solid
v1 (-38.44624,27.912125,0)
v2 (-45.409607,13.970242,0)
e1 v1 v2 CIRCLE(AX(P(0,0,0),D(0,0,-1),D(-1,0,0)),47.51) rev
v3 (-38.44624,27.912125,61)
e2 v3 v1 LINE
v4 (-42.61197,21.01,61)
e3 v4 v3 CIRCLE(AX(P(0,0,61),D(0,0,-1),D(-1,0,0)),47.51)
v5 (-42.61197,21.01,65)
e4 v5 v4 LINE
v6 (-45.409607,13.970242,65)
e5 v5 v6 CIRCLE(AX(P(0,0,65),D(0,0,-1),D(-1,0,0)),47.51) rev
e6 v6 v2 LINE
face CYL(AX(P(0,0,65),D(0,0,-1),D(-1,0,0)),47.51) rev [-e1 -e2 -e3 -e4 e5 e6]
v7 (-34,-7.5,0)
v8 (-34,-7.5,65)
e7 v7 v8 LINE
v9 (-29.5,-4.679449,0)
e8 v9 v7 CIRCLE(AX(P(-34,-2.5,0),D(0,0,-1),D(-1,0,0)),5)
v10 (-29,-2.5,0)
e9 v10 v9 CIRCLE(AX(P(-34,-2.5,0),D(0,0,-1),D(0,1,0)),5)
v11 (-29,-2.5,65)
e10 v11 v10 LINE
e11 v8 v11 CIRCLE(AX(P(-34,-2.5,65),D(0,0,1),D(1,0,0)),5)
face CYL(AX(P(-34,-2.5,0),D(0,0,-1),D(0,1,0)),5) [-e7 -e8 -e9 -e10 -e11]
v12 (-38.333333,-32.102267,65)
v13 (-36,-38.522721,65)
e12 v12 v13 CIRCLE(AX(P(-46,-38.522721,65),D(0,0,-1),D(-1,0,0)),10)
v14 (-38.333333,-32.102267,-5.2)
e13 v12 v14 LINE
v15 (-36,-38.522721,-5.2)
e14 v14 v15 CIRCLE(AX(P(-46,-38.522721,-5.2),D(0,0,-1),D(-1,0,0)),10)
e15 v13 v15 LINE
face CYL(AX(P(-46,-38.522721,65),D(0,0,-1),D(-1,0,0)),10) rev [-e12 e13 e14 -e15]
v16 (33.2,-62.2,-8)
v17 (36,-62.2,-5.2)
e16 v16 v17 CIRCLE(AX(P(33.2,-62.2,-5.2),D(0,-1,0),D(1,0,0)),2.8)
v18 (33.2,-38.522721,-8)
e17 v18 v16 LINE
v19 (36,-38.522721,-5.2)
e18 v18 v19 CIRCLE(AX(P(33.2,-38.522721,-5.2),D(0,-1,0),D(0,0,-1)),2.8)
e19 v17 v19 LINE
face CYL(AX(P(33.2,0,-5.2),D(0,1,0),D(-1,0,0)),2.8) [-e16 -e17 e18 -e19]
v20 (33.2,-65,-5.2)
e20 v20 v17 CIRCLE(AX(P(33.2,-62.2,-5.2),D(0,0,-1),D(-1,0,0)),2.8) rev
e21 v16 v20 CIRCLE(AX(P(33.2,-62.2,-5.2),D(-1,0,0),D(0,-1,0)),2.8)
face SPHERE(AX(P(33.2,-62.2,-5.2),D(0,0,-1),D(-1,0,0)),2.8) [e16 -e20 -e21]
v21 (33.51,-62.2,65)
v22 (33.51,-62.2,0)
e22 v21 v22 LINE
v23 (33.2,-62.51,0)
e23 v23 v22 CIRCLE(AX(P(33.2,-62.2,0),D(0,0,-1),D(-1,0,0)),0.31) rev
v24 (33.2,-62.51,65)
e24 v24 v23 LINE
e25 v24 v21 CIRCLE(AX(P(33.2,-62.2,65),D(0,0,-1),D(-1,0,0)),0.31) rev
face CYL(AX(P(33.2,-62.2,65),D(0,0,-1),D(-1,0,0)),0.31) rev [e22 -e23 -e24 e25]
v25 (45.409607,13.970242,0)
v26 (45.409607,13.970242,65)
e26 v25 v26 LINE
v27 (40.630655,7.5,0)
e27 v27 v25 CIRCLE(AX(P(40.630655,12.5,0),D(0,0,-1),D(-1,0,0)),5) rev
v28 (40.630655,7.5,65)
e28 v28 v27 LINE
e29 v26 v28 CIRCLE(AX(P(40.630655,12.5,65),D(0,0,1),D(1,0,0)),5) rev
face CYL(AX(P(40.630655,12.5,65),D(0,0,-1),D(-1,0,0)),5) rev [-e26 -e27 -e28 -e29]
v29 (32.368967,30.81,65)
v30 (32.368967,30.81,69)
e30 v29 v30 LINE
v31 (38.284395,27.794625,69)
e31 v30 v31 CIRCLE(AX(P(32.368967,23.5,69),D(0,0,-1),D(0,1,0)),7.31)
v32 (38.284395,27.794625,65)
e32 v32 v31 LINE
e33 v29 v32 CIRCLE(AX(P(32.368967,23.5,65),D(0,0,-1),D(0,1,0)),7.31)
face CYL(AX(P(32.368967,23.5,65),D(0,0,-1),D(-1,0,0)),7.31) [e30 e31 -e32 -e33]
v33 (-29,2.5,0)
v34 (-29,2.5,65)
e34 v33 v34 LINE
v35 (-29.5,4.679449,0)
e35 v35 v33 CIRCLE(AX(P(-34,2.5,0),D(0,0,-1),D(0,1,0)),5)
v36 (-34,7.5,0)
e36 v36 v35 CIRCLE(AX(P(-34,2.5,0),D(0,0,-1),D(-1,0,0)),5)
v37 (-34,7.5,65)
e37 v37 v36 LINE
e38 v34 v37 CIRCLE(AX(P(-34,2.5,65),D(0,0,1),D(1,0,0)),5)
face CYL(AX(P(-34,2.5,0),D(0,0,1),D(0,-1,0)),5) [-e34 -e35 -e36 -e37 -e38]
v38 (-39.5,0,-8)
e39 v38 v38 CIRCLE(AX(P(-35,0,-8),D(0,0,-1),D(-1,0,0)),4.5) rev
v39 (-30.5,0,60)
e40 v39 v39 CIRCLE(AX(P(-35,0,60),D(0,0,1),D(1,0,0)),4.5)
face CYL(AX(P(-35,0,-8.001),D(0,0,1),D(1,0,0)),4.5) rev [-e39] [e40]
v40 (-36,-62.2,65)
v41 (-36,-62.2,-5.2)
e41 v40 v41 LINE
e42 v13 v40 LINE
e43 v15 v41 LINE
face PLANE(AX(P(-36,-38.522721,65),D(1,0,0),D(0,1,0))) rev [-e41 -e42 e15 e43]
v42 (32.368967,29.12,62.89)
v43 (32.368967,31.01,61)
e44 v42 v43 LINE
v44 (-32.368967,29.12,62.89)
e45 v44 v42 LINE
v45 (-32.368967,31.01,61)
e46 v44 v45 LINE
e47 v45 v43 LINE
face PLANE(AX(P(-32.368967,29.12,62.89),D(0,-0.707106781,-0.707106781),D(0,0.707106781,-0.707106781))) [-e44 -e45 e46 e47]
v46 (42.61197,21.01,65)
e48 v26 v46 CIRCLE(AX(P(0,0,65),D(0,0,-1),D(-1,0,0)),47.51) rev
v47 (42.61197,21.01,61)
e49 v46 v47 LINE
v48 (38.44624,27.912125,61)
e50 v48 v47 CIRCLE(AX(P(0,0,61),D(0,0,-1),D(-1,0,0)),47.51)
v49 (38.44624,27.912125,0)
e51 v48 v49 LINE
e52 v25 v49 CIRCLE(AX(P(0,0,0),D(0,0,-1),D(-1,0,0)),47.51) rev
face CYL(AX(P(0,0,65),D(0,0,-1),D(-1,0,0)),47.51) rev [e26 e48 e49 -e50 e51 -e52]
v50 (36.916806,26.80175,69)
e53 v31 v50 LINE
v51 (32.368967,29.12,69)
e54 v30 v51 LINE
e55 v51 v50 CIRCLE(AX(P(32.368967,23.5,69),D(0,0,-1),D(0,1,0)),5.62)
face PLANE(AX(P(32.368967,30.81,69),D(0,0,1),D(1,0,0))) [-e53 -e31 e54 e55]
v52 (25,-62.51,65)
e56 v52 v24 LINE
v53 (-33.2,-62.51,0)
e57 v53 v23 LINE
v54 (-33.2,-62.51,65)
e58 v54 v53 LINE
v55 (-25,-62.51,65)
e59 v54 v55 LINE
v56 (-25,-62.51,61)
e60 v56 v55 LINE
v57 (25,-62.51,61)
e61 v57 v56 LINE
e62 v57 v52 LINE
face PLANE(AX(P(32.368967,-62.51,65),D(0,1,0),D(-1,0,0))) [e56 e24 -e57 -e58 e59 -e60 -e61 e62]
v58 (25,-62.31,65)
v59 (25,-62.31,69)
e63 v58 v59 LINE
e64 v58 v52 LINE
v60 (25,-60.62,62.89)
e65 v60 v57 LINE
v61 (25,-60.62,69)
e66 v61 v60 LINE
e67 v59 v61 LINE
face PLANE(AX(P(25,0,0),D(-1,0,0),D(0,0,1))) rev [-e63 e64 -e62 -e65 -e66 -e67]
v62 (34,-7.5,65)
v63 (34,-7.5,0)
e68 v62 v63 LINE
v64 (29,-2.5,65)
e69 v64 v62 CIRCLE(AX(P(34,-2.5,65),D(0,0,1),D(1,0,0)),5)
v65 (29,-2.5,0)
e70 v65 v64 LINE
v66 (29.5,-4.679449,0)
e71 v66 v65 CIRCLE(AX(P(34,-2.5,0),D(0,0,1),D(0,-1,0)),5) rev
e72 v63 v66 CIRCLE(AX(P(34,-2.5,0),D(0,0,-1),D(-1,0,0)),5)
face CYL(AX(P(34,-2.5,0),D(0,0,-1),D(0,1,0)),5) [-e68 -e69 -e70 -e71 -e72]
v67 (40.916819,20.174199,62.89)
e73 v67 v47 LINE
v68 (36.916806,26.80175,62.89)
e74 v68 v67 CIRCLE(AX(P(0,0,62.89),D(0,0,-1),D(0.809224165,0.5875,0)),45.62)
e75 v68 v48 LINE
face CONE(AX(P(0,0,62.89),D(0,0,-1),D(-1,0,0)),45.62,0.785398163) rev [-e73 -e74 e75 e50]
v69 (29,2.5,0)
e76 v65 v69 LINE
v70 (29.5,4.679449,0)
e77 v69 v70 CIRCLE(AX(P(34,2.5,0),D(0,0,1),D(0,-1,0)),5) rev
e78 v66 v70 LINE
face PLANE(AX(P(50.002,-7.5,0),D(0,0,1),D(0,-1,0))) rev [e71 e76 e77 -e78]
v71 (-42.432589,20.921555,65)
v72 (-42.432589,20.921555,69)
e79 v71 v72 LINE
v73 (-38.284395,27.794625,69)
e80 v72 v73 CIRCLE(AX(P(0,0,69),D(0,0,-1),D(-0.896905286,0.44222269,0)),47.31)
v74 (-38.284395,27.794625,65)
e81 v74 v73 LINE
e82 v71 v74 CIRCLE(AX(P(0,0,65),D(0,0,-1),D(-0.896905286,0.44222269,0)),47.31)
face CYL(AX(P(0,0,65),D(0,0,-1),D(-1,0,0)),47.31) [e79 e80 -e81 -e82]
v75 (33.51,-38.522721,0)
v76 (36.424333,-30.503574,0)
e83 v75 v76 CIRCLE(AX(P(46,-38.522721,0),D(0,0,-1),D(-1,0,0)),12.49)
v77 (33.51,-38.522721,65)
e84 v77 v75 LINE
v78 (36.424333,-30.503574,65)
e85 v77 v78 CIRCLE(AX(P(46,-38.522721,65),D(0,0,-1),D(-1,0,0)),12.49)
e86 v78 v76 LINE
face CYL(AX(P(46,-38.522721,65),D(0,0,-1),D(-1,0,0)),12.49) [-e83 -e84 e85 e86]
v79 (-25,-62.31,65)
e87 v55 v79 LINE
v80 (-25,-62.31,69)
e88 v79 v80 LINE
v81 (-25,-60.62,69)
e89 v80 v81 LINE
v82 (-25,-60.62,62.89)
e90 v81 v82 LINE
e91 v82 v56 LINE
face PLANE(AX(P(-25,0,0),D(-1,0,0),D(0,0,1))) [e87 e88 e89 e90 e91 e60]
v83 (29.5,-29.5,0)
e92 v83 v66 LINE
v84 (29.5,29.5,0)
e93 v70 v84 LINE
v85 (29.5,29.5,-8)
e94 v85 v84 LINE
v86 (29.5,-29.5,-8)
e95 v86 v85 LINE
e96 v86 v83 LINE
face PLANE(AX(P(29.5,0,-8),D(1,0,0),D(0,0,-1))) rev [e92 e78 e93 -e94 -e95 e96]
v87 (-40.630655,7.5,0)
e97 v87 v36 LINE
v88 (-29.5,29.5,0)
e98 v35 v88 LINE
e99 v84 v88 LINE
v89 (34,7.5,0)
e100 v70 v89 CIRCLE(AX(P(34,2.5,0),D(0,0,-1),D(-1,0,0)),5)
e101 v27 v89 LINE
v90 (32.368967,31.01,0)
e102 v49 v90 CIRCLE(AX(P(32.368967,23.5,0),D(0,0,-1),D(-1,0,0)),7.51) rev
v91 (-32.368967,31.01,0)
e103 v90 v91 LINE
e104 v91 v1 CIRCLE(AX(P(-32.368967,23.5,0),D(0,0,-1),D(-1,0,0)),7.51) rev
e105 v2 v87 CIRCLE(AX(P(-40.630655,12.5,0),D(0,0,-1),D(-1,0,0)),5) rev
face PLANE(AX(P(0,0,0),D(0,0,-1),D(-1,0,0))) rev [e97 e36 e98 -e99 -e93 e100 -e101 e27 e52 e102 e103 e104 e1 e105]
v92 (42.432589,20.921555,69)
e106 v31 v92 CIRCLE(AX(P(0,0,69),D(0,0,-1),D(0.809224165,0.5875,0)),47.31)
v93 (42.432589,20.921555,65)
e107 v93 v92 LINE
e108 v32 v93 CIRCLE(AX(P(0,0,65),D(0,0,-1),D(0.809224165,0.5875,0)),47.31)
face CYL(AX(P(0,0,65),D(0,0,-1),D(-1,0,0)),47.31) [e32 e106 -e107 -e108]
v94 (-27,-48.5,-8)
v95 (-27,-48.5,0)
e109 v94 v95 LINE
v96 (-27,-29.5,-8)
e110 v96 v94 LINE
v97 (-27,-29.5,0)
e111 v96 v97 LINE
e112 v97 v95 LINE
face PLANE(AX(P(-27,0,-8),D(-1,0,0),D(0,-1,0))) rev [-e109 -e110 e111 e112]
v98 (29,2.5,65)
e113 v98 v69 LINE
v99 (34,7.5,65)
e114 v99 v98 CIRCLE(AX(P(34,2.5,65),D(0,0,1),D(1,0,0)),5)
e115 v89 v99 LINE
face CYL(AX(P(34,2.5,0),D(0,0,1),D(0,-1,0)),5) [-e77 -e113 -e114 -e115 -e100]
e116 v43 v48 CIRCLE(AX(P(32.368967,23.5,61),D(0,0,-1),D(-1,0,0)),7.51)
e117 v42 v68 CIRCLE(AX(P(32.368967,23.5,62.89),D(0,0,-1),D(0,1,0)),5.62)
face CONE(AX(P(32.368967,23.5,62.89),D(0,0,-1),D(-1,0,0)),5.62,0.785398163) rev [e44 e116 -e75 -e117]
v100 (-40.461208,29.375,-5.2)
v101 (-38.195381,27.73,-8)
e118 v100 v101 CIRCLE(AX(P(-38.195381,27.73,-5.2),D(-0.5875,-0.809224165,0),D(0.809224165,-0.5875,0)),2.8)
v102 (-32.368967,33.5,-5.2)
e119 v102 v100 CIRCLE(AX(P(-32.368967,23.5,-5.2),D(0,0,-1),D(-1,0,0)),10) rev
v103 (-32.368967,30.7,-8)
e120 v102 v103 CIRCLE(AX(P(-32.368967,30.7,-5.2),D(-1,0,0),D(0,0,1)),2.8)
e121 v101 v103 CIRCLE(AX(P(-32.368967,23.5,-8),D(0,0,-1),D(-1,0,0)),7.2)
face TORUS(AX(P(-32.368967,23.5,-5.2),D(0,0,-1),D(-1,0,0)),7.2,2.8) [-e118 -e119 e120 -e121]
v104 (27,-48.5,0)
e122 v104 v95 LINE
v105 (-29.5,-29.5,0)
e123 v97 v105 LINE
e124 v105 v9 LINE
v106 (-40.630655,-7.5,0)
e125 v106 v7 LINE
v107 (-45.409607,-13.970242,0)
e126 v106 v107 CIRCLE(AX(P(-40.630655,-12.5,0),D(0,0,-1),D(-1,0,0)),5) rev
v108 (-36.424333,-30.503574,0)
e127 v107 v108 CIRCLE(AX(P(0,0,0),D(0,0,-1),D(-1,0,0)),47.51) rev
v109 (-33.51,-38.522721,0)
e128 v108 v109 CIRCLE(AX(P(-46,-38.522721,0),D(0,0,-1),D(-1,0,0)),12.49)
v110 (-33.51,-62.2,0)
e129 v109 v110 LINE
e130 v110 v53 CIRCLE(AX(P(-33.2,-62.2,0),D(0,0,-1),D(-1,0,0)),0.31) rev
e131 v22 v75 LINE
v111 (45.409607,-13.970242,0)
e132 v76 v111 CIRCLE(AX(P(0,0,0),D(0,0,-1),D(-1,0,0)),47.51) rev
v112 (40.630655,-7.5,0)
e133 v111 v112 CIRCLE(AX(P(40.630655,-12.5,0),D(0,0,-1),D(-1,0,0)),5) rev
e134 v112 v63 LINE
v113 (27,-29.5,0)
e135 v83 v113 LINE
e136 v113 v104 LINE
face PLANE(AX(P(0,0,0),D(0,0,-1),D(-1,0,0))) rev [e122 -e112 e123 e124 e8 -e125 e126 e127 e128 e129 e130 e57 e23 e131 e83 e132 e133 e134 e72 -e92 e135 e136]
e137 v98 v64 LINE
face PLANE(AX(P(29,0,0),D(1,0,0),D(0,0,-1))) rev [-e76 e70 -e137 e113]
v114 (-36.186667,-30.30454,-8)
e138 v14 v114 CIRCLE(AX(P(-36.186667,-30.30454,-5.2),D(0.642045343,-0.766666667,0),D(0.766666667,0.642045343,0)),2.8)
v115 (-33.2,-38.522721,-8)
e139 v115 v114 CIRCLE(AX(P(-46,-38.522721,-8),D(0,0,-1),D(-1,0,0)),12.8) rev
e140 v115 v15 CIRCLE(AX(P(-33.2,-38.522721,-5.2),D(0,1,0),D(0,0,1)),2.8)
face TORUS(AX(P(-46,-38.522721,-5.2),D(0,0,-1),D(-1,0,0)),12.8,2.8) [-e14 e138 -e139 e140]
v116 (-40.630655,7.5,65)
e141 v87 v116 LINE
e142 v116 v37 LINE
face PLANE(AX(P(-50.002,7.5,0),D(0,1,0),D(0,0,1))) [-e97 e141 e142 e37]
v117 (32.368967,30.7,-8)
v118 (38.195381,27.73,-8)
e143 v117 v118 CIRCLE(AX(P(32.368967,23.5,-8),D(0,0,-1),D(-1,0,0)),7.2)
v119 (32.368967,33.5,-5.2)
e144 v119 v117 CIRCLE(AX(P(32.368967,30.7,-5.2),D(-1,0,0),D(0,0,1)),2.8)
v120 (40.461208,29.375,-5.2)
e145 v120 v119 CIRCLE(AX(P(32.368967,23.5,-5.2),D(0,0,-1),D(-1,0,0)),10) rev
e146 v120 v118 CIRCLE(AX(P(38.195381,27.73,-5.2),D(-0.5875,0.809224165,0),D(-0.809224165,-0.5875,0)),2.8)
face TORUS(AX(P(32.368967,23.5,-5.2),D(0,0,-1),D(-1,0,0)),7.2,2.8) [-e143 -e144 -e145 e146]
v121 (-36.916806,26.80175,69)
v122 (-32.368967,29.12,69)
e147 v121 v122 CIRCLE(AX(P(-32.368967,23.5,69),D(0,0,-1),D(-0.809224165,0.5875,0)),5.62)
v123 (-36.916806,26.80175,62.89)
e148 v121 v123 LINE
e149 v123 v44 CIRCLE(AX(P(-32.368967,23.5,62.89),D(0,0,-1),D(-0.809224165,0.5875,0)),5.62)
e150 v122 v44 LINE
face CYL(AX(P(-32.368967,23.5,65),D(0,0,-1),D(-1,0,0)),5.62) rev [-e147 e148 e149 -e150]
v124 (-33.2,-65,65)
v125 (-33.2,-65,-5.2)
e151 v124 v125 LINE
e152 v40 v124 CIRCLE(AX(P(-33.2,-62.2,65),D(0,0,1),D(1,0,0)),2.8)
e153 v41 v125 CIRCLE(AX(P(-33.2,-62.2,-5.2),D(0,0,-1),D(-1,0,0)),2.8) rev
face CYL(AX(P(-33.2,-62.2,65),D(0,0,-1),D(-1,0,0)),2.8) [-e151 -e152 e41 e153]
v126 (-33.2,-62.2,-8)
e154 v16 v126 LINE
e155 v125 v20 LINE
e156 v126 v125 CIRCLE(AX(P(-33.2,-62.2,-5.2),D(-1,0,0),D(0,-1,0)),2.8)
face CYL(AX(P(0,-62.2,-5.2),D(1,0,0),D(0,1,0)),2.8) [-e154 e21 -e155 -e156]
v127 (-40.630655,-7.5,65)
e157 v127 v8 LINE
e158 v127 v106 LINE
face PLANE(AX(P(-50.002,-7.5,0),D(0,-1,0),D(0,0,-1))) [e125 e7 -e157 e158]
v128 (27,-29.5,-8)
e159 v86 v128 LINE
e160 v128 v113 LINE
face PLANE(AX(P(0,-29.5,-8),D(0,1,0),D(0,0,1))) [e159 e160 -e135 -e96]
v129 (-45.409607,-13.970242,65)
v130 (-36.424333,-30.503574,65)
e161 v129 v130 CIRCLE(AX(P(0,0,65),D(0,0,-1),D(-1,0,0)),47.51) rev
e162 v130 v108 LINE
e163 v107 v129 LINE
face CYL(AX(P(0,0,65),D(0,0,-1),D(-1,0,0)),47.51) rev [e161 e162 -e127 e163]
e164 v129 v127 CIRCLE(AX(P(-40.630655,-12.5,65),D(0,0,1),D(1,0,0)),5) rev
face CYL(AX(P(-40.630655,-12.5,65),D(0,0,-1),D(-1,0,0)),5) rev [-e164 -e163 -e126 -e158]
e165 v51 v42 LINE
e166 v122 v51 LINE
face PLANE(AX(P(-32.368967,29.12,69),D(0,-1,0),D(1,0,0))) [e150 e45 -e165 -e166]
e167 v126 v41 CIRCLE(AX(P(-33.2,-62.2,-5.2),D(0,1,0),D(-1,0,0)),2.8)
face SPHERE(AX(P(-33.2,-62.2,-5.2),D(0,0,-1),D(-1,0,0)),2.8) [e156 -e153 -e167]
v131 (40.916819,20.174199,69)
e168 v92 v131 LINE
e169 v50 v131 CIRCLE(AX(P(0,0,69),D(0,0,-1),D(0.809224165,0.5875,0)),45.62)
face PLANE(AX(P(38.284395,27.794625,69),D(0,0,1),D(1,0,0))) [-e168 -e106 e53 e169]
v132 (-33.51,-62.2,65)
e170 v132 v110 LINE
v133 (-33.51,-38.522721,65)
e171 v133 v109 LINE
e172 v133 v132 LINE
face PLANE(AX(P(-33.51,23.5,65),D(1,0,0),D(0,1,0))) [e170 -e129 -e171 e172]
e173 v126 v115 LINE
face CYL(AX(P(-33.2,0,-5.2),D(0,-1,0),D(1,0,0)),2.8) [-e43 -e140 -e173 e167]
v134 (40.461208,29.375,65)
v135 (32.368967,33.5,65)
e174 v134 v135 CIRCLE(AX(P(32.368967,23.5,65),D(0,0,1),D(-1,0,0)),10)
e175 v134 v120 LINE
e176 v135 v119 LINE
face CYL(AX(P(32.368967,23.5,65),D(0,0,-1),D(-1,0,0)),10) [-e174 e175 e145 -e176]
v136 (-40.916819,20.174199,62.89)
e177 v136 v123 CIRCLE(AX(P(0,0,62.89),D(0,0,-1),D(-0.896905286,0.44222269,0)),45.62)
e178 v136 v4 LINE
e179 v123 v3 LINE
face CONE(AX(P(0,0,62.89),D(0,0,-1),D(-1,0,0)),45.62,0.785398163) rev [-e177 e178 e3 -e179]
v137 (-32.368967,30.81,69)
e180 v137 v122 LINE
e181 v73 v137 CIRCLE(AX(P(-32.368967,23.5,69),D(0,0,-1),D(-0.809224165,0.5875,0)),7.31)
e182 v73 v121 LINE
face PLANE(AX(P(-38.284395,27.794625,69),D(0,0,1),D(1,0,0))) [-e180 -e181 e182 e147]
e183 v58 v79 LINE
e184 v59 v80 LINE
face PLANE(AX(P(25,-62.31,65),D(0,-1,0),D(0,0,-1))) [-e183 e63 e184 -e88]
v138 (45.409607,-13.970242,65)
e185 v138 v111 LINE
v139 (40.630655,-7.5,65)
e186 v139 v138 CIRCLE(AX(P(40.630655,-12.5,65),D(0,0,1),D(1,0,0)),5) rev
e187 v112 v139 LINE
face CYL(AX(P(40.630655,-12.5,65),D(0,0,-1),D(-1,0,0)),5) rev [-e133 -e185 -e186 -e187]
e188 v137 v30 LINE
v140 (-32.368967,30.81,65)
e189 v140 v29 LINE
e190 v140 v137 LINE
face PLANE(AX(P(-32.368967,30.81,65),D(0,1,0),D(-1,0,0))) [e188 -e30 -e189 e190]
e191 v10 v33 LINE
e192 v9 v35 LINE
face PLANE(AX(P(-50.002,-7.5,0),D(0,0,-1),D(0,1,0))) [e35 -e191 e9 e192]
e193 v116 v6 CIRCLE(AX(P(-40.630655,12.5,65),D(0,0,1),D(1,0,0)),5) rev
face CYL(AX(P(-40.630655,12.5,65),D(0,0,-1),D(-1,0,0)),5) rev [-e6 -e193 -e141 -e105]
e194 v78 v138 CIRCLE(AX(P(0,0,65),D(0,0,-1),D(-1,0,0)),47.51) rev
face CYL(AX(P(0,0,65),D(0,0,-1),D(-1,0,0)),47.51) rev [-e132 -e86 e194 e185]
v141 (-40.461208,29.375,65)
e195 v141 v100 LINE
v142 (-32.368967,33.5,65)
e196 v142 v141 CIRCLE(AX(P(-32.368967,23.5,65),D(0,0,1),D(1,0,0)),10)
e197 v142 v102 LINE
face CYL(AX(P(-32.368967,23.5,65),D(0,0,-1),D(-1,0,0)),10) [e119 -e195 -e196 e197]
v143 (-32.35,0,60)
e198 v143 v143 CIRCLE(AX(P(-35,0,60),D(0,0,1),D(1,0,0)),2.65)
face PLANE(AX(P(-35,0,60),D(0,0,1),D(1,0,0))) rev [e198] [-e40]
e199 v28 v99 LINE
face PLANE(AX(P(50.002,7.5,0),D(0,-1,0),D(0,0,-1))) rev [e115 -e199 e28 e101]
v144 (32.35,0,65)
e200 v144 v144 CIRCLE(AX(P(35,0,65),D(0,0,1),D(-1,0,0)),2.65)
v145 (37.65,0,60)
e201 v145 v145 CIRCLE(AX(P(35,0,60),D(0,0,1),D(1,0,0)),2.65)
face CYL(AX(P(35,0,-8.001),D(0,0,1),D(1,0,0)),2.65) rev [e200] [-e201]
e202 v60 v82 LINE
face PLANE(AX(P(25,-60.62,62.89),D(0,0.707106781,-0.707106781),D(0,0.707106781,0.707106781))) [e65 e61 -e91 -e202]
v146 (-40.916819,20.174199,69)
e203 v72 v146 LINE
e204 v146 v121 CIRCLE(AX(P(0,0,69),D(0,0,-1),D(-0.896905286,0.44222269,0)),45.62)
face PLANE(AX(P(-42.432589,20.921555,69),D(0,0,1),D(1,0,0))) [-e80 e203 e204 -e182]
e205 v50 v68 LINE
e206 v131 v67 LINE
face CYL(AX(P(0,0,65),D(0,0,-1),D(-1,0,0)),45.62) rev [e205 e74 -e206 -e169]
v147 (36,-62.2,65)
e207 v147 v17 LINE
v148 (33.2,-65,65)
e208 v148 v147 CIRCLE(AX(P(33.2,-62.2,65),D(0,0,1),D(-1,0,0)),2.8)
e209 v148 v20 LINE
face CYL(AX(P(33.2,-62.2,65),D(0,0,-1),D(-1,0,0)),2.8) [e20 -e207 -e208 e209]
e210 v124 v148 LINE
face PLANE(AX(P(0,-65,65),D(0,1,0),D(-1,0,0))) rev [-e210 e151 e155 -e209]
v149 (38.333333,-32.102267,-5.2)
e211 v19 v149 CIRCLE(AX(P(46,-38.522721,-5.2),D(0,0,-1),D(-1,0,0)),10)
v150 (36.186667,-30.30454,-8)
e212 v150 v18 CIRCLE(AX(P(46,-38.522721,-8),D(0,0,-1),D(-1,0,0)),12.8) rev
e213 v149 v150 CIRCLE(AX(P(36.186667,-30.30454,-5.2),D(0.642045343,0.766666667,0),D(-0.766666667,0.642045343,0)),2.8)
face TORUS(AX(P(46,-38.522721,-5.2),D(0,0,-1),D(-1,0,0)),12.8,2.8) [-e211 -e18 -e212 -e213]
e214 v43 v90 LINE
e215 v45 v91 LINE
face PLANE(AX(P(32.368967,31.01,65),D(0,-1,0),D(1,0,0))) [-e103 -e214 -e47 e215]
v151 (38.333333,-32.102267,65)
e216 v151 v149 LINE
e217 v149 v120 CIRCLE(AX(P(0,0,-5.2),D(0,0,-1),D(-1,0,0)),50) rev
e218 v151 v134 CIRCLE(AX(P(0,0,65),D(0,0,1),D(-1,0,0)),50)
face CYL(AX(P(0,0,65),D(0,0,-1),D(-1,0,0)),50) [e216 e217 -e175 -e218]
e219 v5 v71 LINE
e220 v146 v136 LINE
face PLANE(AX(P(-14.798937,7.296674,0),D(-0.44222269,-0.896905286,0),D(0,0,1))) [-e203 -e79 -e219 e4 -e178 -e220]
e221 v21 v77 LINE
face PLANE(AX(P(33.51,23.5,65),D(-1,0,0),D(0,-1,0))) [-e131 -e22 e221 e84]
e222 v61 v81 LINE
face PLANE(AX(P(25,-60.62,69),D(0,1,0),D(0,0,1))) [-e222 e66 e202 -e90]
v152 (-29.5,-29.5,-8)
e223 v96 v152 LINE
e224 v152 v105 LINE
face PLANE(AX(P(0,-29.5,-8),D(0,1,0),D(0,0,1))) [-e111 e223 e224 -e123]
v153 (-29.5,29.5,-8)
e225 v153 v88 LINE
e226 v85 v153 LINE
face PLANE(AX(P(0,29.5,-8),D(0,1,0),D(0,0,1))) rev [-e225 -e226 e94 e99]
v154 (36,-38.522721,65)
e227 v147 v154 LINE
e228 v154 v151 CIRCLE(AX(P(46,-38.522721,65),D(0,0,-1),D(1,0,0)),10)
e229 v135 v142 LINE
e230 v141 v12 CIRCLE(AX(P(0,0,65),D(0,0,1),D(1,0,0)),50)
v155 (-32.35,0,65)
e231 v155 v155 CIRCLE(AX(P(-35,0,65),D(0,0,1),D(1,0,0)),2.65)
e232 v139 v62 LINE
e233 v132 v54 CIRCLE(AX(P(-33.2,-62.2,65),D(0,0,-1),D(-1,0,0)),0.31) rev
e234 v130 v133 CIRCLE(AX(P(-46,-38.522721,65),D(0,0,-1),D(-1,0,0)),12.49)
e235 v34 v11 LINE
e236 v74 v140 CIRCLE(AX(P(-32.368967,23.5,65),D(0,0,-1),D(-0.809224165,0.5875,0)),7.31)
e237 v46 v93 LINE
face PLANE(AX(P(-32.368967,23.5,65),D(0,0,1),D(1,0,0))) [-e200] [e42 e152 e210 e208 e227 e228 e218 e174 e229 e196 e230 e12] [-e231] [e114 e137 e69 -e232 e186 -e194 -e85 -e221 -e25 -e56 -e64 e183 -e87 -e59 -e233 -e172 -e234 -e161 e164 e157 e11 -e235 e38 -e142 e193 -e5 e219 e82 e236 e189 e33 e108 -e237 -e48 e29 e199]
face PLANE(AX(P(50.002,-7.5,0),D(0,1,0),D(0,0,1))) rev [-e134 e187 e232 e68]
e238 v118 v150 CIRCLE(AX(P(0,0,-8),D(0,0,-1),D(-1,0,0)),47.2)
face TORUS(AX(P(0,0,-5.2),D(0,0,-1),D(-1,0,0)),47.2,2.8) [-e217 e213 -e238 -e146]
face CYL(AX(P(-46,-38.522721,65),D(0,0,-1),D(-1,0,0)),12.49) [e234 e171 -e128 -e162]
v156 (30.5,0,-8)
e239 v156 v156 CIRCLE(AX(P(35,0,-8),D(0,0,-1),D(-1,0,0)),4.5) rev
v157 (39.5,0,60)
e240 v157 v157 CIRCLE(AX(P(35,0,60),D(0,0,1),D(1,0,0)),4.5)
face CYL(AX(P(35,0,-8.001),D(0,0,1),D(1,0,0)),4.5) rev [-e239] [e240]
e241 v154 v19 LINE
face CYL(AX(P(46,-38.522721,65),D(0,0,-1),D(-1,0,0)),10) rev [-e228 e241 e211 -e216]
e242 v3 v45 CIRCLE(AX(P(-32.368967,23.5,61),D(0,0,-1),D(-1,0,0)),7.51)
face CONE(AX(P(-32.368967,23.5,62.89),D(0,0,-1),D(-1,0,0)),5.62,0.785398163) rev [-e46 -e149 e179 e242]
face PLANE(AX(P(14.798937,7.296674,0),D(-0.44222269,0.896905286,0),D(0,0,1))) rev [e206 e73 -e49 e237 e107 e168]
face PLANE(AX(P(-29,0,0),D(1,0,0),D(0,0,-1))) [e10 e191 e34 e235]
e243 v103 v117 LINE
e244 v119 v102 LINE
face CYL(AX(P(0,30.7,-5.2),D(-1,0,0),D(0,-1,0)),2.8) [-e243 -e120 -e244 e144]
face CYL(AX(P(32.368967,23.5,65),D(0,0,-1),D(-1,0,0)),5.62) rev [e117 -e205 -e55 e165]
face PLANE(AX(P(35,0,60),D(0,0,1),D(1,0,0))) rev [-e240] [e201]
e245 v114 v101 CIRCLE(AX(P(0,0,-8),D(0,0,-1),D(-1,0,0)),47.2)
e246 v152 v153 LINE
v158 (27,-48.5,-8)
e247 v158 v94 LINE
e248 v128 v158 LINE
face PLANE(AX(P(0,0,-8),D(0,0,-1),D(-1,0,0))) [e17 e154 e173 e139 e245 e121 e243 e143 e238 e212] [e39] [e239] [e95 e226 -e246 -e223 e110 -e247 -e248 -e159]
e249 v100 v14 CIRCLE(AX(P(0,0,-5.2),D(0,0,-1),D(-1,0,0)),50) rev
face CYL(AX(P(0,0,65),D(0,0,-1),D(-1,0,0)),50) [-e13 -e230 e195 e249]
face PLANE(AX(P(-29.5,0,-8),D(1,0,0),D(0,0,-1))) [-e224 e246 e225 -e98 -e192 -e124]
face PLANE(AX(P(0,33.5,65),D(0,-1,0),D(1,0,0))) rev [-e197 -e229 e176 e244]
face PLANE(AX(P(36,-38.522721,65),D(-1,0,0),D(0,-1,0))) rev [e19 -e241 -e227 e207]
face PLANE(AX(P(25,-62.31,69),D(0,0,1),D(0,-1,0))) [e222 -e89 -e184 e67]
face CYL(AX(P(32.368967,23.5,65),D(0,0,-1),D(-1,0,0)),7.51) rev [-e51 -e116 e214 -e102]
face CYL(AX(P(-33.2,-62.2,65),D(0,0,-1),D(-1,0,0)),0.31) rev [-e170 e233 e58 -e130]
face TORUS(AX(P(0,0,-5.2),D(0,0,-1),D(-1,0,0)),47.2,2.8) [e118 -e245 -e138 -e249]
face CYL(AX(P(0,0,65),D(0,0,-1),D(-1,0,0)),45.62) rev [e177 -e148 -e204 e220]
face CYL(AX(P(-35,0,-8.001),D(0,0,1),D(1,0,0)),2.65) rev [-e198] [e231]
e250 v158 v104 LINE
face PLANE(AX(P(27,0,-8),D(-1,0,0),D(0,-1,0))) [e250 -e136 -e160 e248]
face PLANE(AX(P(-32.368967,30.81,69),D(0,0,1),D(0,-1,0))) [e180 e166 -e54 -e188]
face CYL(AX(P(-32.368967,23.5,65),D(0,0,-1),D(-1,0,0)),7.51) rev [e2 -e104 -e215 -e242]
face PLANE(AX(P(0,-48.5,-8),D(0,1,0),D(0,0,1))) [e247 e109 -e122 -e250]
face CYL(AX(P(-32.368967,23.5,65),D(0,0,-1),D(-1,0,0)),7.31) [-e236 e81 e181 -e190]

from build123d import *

# Parameters (mm, degrees)
LINEAR_AUSTRAGEN_D_NN1_DEPTH         = 65
AUFSATZ_LINEAR_START                 = 8
AUFSATZ_LINEAR_AUSTRAGEN2_DEPTH      = 8
AUFSATZ_LINEAR_AUSTRAGEN3_REACH      = 135.642
AUFSATZ_LINEAR_AUSTRAGEN3_END_RADIUS = 47.51
AUFSATZ_LINEAR_START_2               = 29
SKIZZE6_W                            = 65
SKIZZE6_H                            = 15
AUFSATZ_LINEAR_AUSTRAGEN4_REACH      = 135.642
AUFSATZ_LINEAR_START_3               = -29
SKIZZE6_2_W                          = 65
SKIZZE6_2_H                          = 15
SCHNITT_LINEAR_AUSTRAGEN2_REACH      = 111.791
SKIZZE7_R                            = 2.65
SCHNITT_LINEAR_AUSTRAGEN3_REACH      = 116.791
SCHNITT_LINEAR_START                 = -5
SKIZZE8_R                            = 4.5
AUFSATZ_LINEAR_AUSTRAGEN6_DEPTH      = 25
VERRUNDUNG1_R                        = 5
VERRUNDUNG3_R                        = 2.8


with BuildPart() as part:
    # Skizze1 → Linear-Austragen-Dünn1 (new body)
    with BuildSketch(Plane.XY):
        with BuildLine():
            Line((-33.2, -65), (0, -65))
            Line((0, -65), (33.2, -65))
            ThreePointArc((33.2, -65), (35.179898987, -64.179898987), (36, -62.2))
            Line((36, -62.2), (36, -38.522720569))
            ThreePointArc((36, -38.522720569), (36.601418547, -35.107070313), (38.333333333, -32.10226714))
            ThreePointArc((38.333333333, -32.10226714), (49.970076451, -1.729583607), (40.461208274, 29.375))
            ThreePointArc((40.461208274, 29.375), (36.91044215, 32.409264841), (32.368966619, 33.5))
            Line((32.368966619, 33.5), (0, 33.5))
            Line((0, 33.5), (-32.368966619, 33.5))
            ThreePointArc((-32.368966619, 33.5), (-36.91044215, 32.409264841), (-40.461208274, 29.375))
            ThreePointArc((-40.461208274, 29.375), (-49.970076451, -1.729583607), (-38.333333333, -32.10226714))
            ThreePointArc((-38.333333333, -32.10226714), (-36.601418547, -35.107070313), (-36, -38.522720569))
            Line((-36, -38.522720569), (-36, -62.2))
            ThreePointArc((-36, -62.2), (-35.179898987, -64.179898987), (-33.2, -65))
        make_face()
        with BuildLine():
            Line((-33.2, -62.51), (0, -62.51))
            Line((0, -62.51), (33.2, -62.51))
            ThreePointArc((33.2, -62.51), (33.419203102, -62.419203102), (33.51, -62.2))
            Line((33.51, -62.2), (33.51, -38.522720569))
            ThreePointArc((33.51, -38.522720569), (34.261171765, -34.2565734), (36.424333333, -30.503574237))
            ThreePointArc((36.424333333, -30.503574237), (47.481566644, -1.643450344), (38.446240102, 27.912125))
            ThreePointArc((38.446240102, 27.912125), (35.779614743, 30.190857895), (32.368966619, 31.01))
            Line((32.368966619, 31.01), (0, 31.01))
            Line((0, 31.01), (-32.368966619, 31.01))
            ThreePointArc((-32.368966619, 31.01), (-35.779614743, 30.190857895), (-38.446240102, 27.912125))
            ThreePointArc((-38.446240102, 27.912125), (-47.481566644, -1.643450344), (-36.424333333, -30.503574237))
            ThreePointArc((-36.424333333, -30.503574237), (-34.261171765, -34.2565734), (-33.51, -38.522720569))
            Line((-33.51, -38.522720569), (-33.51, -62.2))
            ThreePointArc((-33.51, -62.2), (-33.419203102, -62.419203102), (-33.2, -62.51))
        make_face(mode=Mode.SUBTRACT)
    extrude(amount=LINEAR_AUSTRAGEN_D_NN1_DEPTH)

    # Skizze3 → Aufsatz-Linear austragen2 (add)
    # profile 1 of 2: a face of its own
    with BuildSketch(Plane(origin=(0, 0, 0), x_dir=(-1, 0, 0), z_dir=(0, 0, -1)).offset(AUFSATZ_LINEAR_START)):
        with BuildLine():
            ThreePointArc((40.461208274, 29.375), (36.91044215, 32.409264841), (32.368966619, 33.5))
            Line((32.368966619, 33.5), (-32.368966619, 33.5))
            ThreePointArc((-32.368966619, 33.5), (-36.91044215, 32.409264841), (-40.461208274, 29.375))
            ThreePointArc((-40.461208274, 29.375), (-49.970076451, -1.729583607), (-38.333333333, -32.10226714))
            ThreePointArc((-38.333333333, -32.10226714), (-36.601418547, -35.107070313), (-36, -38.522720569))
            Line((-36, -38.522720569), (-36, -62.2))
            ThreePointArc((-36, -62.2), (-35.179898987, -64.179898987), (-33.2, -65))
            Line((-33.2, -65), (33.2, -65))
            ThreePointArc((33.2, -65), (35.179898987, -64.179898987), (36, -62.2))
            Line((36, -62.2), (36, -38.522720569))
            ThreePointArc((36, -38.522720569), (36.601418547, -35.107070313), (38.333333333, -32.10226714))
            ThreePointArc((38.333333333, -32.10226714), (49.970076451, -1.729583607), (40.461208274, 29.375))
        make_face()
        with BuildLine():
            ThreePointArc((-38.446240102, 27.912125), (-35.779614743, 30.190857895), (-32.368966619, 31.01))
            Line((-32.368966619, 31.01), (32.368966619, 31.01))
            ThreePointArc((32.368966619, 31.01), (35.779614743, 30.190857895), (38.446240102, 27.912125))
            ThreePointArc((38.446240102, 27.912125), (47.481566644, -1.643450344), (36.424333333, -30.503574237))
            ThreePointArc((36.424333333, -30.503574237), (34.261171765, -34.2565734), (33.51, -38.522720569))
            Line((33.51, -38.522720569), (33.51, -62.2))
            ThreePointArc((33.51, -62.2), (33.419203102, -62.419203102), (33.2, -62.51))
            Line((33.2, -62.51), (-33.2, -62.51))
            ThreePointArc((-33.2, -62.51), (-33.419203102, -62.419203102), (-33.51, -62.2))
            Line((-33.51, -62.2), (-33.51, -38.522720569))
            ThreePointArc((-33.51, -38.522720569), (-34.261171765, -34.2565734), (-36.424333333, -30.503574237))
            ThreePointArc((-36.424333333, -30.503574237), (-47.481566644, -1.643450344), (-38.446240102, 27.912125))
        make_face(mode=Mode.SUBTRACT)
    # profile 2 of 2: a face of its own
    with BuildSketch(Plane(origin=(0, 0, 0), x_dir=(-1, 0, 0), z_dir=(0, 0, -1)).offset(AUFSATZ_LINEAR_START)):
        with BuildLine():
            Line((32.368966619, 31.01), (-32.368966619, 31.01))
            ThreePointArc((-32.368966619, 31.01), (-35.779614743, 30.190857895), (-38.446240102, 27.912125))
            ThreePointArc((-38.446240102, 27.912125), (-47.481566644, -1.643450344), (-36.424333333, -30.503574237))
            ThreePointArc((-36.424333333, -30.503574237), (-34.261171765, -34.2565734), (-33.51, -38.522720569))
            Line((-33.51, -38.522720569), (-33.51, -62.2))
            ThreePointArc((-33.51, -62.2), (-33.419203102, -62.419203102), (-33.2, -62.51))
            Line((-33.2, -62.51), (33.2, -62.51))
            ThreePointArc((33.2, -62.51), (33.419203102, -62.419203102), (33.51, -62.2))
            Line((33.51, -62.2), (33.51, -38.522720569))
            ThreePointArc((33.51, -38.522720569), (34.261171765, -34.2565734), (36.424333333, -30.503574237))
            ThreePointArc((36.424333333, -30.503574237), (47.481566644, -1.643450344), (38.446240102, 27.912125))
            ThreePointArc((38.446240102, 27.912125), (35.779614743, 30.190857895), (32.368966619, 31.01))
        make_face()
        Polygon((-27, -29.5), (-29.5, -29.5), (-29.5, 29.5), (29.5, 29.5), (29.5, -29.5), (27, -29.5), (27, -48.5), (-27, -48.5), align=None, mode=Mode.SUBTRACT)
    extrude(amount=-AUFSATZ_LINEAR_AUSTRAGEN2_DEPTH)

    # Aufsatz-Linear austragen3: up to this cylinder (the profile starts inside it)
    aufsatz_linear_austragen3_end = Plane(origin=(0, 0, 32.5), z_dir=(0, 0, -1)) * Cylinder(AUFSATZ_LINEAR_AUSTRAGEN3_END_RADIUS, 367.304, mode=Mode.PRIVATE)
    # Skizze6 → Aufsatz-Linear austragen3 (add, up to the surface)
    with BuildSketch(Plane(origin=(0, 0, 0), x_dir=(0, 0, -1), z_dir=(1, 0, 0)).offset(AUFSATZ_LINEAR_START_2), mode=Mode.PRIVATE) as aufsatz_linear_austragen3_sk1:
        with Locations((-32.5, 0)):
            Rectangle(SKIZZE6_W, SKIZZE6_H)
    aufsatz_linear_austragen3_tool1 = extrude(aufsatz_linear_austragen3_sk1.sketch, amount=AUFSATZ_LINEAR_AUSTRAGEN3_REACH, mode=Mode.PRIVATE) & aufsatz_linear_austragen3_end
    add(aufsatz_linear_austragen3_tool1.solids().sort_by_distance((29, 0, 32.5))[0])

    # Skizze6<2> → Aufsatz-Linear austragen4 (add, up to next)
    with BuildSketch(Plane(origin=(0, 0, 0), x_dir=(0, 0, -1), z_dir=(1, 0, 0)).offset(AUFSATZ_LINEAR_START_3), mode=Mode.PRIVATE) as aufsatz_linear_austragen4_sk1:
        with Locations((-32.5, 0)):
            Rectangle(SKIZZE6_2_W, SKIZZE6_2_H)
    aufsatz_linear_austragen4_tool1 = extrude(aufsatz_linear_austragen4_sk1.sketch, amount=-AUFSATZ_LINEAR_AUSTRAGEN4_REACH, mode=Mode.PRIVATE) - part.part
    add(aufsatz_linear_austragen4_tool1.solids().sort_by_distance((-29, 0, 32.5))[0])

    # Skizze7 → Schnitt-Linear austragen2 (cut, up to next)
    with BuildSketch(Plane.XY.offset(65), mode=Mode.PRIVATE) as schnitt_linear_austragen2_sk1:
        with Locations((-35, 0)):
            Circle(SKIZZE7_R)
    schnitt_linear_austragen2_tool1 = extrude(schnitt_linear_austragen2_sk1.sketch, amount=-SCHNITT_LINEAR_AUSTRAGEN2_REACH, mode=Mode.PRIVATE) & part.part
    # Skizze7 → Schnitt-Linear austragen2 (cut, up to next)
    with BuildSketch(Plane.XY.offset(65), mode=Mode.PRIVATE) as schnitt_linear_austragen2_sk2:
        with Locations(Location((35, 0, 0), (0, 0, 180))):
            Circle(SKIZZE7_R)
    schnitt_linear_austragen2_tool2 = extrude(schnitt_linear_austragen2_sk2.sketch, amount=-SCHNITT_LINEAR_AUSTRAGEN2_REACH, mode=Mode.PRIVATE) & part.part
    add(schnitt_linear_austragen2_tool1.solids().sort_by_distance((-35, 0, 65))[0], mode=Mode.SUBTRACT)
    add(schnitt_linear_austragen2_tool2.solids().sort_by_distance((35, 0, 65))[0], mode=Mode.SUBTRACT)

    # Skizze8 → Schnitt-Linear austragen3 (cut, up to next)
    with BuildSketch(Plane.XY.offset(65).offset(SCHNITT_LINEAR_START), mode=Mode.PRIVATE) as schnitt_linear_austragen3_sk1:
        with Locations((-35, 0)):
            Circle(SKIZZE8_R)
    schnitt_linear_austragen3_tool1 = extrude(schnitt_linear_austragen3_sk1.sketch, amount=-SCHNITT_LINEAR_AUSTRAGEN3_REACH, mode=Mode.PRIVATE) & part.part
    # Skizze8 → Schnitt-Linear austragen3 (cut, up to next)
    with BuildSketch(Plane.XY.offset(65).offset(SCHNITT_LINEAR_START), mode=Mode.PRIVATE) as schnitt_linear_austragen3_sk2:
        with Locations((35, 0)):
            Circle(SKIZZE8_R)
    schnitt_linear_austragen3_tool2 = extrude(schnitt_linear_austragen3_sk2.sketch, amount=-SCHNITT_LINEAR_AUSTRAGEN3_REACH, mode=Mode.PRIVATE) & part.part
    add(schnitt_linear_austragen3_tool1.solids().sort_by_distance((-35, 0, 60))[0], mode=Mode.SUBTRACT)
    add(schnitt_linear_austragen3_tool2.solids().sort_by_distance((35, 0, 60))[0], mode=Mode.SUBTRACT)

    # Austragung12: sweep along a path in Skizze10
    with BuildLine(Plane.XY.offset(65)) as austragung12_path:
        ThreePointArc((-42.611970149, 21.01), (-40.675769134, 24.549580553), (-38.446240102, 27.912125))
        ThreePointArc((-38.446240102, 27.912125), (-35.779614743, 30.190857895), (-32.368966619, 31.01))
        Line((-32.368966619, 31.01), (32.368966619, 31.01))
        ThreePointArc((32.368966619, 31.01), (35.779614743, 30.190857895), (38.446240102, 27.912125))
        ThreePointArc((38.446240102, 27.912125), (40.675769134, 24.549580553), (42.611970149, 21.01))
    # Skizze9 → Austragung12 (sweep)
    with BuildSketch(Plane(origin=(0, 0, 0), x_dir=(0, 0, -1), z_dir=(1, 0, 0))):
        Polygon((-65, 31.01), (-65, 30.81), (-69, 30.81), (-69, 29.12), (-62.89, 29.12), (-60, 32.01), (-65, 32.01), align=None)
    sweep(path=austragung12_path.line)

    # Skizze9<4> → Aufsatz-Linear austragen6 (add, symmetric)
    with BuildSketch(Plane(origin=(0, 0, 0), x_dir=(0, 0, -1), z_dir=(1, 0, 0))):
        Polygon((-65, -63.51), (-60, -63.51), (-62.89, -60.62), (-69, -60.62), (-69, -62.31), (-65, -62.31), (-65, -62.51), align=None)
    extrude(amount=AUFSATZ_LINEAR_AUSTRAGEN6_DEPTH, both=True)

    # Verrundung1
    # the kernel refuses this fillet: 5 mm, written as the material it adds along each edge
    with BuildSketch(Plane(origin=(46.914284605, 7.5, 65), x_dir=(-1, 0, 0), z_dir=(0, 0, -1)), Plane(origin=(-46.914284605, -7.5, 65), x_dir=(1, 0, 0), z_dir=(0, 0, -1))) as verrundung1_piece_1:
        with BuildLine():
            CenterArc((6.283629922, 5), VERRUNDUNG1_R, 162.899512403, 107.100487597)
            ThreePointArc((1.504677359, 6.470242296), (0.639115665, 3.261451554), (0, 0))
            Line((0, 0), (6.283629922, 0))
        make_face()
    extrude(amount=65)
    with BuildSketch(Plane(origin=(46.914284605, -7.5, 65), x_dir=(-0.22650918867747508, -0.9740090284205132, 0), z_dir=(0, 0, -1)), Plane(origin=(-46.914284605, 7.5, 65), x_dir=(0.2265091886774727, 0.9740090284205137, 0), z_dir=(0, 0, -1))) as verrundung1_piece_2:
        with BuildLine():
            CenterArc((6.293345058, 4.987766332), VERRUNDUNG1_R, 166.908360234, 107.100487597)
            Line((1.423299915, 6.120312275), (0, 0))
            ThreePointArc((0, 0), (3.32144883, -0.116244318), (6.64289766, 0))
        make_face()
    extrude(amount=65)
    # the kernel refuses this fillet: 5 mm, written as the material it takes off along each edge
    with BuildSketch(Plane(origin=(29, 7.5, 77.5), x_dir=(1, 0, 0), z_dir=(0, 0, -1)), Plane(origin=(-29, 7.5, 77.5), x_dir=(0, -1, 0), z_dir=(0, 0, -1))) as verrundung1_2_piece_1:
        with BuildLine():
            CenterArc((VERRUNDUNG1_R, VERRUNDUNG1_R), VERRUNDUNG1_R, 180, 90)
            Line((0, VERRUNDUNG1_R), (0, 0))
            Line((0, 0), (VERRUNDUNG1_R, 0))
        make_face()
    extrude(amount=77.5, mode=Mode.SUBTRACT)
    with BuildSketch(Plane(origin=(29, -7.5, 0), x_dir=(0, 1, 0), z_dir=(0, 0, 1)), Plane(origin=(-29, -7.5, 0), x_dir=(-1, 0, 0), z_dir=(0, 0, 1))) as verrundung1_2_piece_2:
        with BuildLine():
            CenterArc((VERRUNDUNG1_R, -VERRUNDUNG1_R), VERRUNDUNG1_R, 90, 90)
            Line((0, -VERRUNDUNG1_R), (0, 0))
            Line((0, 0), (VERRUNDUNG1_R, 0))
        make_face()
    extrude(amount=77.5, mode=Mode.SUBTRACT)

    # Verrundung3
    verrundung3_edges = [part.edges().sort_by_distance(p)[0] for p in [
        (-36.91044215, 32.409264841, -8),
        (0, 33.5, -8),
        (36.91044215, 32.409264841, -8),
        (49.970076451, -1.729583607, -8),
        (36.601418547, -35.107070313, -8),
        (36, -50.361360284, -8),
        (35.179898987, -64.179898987, -8),
        (0, -65, -8),
        (-35.179898987, -64.179898987, -8),
        (-36, -50.361360284, -8),
        (-36.601418547, -35.107070313, -8),
        (-49.970076451, -1.729583607, -8),
    ]]
    fillet(verrundung3_edges, radius=VERRUNDUNG3_R)


solid = part.part
